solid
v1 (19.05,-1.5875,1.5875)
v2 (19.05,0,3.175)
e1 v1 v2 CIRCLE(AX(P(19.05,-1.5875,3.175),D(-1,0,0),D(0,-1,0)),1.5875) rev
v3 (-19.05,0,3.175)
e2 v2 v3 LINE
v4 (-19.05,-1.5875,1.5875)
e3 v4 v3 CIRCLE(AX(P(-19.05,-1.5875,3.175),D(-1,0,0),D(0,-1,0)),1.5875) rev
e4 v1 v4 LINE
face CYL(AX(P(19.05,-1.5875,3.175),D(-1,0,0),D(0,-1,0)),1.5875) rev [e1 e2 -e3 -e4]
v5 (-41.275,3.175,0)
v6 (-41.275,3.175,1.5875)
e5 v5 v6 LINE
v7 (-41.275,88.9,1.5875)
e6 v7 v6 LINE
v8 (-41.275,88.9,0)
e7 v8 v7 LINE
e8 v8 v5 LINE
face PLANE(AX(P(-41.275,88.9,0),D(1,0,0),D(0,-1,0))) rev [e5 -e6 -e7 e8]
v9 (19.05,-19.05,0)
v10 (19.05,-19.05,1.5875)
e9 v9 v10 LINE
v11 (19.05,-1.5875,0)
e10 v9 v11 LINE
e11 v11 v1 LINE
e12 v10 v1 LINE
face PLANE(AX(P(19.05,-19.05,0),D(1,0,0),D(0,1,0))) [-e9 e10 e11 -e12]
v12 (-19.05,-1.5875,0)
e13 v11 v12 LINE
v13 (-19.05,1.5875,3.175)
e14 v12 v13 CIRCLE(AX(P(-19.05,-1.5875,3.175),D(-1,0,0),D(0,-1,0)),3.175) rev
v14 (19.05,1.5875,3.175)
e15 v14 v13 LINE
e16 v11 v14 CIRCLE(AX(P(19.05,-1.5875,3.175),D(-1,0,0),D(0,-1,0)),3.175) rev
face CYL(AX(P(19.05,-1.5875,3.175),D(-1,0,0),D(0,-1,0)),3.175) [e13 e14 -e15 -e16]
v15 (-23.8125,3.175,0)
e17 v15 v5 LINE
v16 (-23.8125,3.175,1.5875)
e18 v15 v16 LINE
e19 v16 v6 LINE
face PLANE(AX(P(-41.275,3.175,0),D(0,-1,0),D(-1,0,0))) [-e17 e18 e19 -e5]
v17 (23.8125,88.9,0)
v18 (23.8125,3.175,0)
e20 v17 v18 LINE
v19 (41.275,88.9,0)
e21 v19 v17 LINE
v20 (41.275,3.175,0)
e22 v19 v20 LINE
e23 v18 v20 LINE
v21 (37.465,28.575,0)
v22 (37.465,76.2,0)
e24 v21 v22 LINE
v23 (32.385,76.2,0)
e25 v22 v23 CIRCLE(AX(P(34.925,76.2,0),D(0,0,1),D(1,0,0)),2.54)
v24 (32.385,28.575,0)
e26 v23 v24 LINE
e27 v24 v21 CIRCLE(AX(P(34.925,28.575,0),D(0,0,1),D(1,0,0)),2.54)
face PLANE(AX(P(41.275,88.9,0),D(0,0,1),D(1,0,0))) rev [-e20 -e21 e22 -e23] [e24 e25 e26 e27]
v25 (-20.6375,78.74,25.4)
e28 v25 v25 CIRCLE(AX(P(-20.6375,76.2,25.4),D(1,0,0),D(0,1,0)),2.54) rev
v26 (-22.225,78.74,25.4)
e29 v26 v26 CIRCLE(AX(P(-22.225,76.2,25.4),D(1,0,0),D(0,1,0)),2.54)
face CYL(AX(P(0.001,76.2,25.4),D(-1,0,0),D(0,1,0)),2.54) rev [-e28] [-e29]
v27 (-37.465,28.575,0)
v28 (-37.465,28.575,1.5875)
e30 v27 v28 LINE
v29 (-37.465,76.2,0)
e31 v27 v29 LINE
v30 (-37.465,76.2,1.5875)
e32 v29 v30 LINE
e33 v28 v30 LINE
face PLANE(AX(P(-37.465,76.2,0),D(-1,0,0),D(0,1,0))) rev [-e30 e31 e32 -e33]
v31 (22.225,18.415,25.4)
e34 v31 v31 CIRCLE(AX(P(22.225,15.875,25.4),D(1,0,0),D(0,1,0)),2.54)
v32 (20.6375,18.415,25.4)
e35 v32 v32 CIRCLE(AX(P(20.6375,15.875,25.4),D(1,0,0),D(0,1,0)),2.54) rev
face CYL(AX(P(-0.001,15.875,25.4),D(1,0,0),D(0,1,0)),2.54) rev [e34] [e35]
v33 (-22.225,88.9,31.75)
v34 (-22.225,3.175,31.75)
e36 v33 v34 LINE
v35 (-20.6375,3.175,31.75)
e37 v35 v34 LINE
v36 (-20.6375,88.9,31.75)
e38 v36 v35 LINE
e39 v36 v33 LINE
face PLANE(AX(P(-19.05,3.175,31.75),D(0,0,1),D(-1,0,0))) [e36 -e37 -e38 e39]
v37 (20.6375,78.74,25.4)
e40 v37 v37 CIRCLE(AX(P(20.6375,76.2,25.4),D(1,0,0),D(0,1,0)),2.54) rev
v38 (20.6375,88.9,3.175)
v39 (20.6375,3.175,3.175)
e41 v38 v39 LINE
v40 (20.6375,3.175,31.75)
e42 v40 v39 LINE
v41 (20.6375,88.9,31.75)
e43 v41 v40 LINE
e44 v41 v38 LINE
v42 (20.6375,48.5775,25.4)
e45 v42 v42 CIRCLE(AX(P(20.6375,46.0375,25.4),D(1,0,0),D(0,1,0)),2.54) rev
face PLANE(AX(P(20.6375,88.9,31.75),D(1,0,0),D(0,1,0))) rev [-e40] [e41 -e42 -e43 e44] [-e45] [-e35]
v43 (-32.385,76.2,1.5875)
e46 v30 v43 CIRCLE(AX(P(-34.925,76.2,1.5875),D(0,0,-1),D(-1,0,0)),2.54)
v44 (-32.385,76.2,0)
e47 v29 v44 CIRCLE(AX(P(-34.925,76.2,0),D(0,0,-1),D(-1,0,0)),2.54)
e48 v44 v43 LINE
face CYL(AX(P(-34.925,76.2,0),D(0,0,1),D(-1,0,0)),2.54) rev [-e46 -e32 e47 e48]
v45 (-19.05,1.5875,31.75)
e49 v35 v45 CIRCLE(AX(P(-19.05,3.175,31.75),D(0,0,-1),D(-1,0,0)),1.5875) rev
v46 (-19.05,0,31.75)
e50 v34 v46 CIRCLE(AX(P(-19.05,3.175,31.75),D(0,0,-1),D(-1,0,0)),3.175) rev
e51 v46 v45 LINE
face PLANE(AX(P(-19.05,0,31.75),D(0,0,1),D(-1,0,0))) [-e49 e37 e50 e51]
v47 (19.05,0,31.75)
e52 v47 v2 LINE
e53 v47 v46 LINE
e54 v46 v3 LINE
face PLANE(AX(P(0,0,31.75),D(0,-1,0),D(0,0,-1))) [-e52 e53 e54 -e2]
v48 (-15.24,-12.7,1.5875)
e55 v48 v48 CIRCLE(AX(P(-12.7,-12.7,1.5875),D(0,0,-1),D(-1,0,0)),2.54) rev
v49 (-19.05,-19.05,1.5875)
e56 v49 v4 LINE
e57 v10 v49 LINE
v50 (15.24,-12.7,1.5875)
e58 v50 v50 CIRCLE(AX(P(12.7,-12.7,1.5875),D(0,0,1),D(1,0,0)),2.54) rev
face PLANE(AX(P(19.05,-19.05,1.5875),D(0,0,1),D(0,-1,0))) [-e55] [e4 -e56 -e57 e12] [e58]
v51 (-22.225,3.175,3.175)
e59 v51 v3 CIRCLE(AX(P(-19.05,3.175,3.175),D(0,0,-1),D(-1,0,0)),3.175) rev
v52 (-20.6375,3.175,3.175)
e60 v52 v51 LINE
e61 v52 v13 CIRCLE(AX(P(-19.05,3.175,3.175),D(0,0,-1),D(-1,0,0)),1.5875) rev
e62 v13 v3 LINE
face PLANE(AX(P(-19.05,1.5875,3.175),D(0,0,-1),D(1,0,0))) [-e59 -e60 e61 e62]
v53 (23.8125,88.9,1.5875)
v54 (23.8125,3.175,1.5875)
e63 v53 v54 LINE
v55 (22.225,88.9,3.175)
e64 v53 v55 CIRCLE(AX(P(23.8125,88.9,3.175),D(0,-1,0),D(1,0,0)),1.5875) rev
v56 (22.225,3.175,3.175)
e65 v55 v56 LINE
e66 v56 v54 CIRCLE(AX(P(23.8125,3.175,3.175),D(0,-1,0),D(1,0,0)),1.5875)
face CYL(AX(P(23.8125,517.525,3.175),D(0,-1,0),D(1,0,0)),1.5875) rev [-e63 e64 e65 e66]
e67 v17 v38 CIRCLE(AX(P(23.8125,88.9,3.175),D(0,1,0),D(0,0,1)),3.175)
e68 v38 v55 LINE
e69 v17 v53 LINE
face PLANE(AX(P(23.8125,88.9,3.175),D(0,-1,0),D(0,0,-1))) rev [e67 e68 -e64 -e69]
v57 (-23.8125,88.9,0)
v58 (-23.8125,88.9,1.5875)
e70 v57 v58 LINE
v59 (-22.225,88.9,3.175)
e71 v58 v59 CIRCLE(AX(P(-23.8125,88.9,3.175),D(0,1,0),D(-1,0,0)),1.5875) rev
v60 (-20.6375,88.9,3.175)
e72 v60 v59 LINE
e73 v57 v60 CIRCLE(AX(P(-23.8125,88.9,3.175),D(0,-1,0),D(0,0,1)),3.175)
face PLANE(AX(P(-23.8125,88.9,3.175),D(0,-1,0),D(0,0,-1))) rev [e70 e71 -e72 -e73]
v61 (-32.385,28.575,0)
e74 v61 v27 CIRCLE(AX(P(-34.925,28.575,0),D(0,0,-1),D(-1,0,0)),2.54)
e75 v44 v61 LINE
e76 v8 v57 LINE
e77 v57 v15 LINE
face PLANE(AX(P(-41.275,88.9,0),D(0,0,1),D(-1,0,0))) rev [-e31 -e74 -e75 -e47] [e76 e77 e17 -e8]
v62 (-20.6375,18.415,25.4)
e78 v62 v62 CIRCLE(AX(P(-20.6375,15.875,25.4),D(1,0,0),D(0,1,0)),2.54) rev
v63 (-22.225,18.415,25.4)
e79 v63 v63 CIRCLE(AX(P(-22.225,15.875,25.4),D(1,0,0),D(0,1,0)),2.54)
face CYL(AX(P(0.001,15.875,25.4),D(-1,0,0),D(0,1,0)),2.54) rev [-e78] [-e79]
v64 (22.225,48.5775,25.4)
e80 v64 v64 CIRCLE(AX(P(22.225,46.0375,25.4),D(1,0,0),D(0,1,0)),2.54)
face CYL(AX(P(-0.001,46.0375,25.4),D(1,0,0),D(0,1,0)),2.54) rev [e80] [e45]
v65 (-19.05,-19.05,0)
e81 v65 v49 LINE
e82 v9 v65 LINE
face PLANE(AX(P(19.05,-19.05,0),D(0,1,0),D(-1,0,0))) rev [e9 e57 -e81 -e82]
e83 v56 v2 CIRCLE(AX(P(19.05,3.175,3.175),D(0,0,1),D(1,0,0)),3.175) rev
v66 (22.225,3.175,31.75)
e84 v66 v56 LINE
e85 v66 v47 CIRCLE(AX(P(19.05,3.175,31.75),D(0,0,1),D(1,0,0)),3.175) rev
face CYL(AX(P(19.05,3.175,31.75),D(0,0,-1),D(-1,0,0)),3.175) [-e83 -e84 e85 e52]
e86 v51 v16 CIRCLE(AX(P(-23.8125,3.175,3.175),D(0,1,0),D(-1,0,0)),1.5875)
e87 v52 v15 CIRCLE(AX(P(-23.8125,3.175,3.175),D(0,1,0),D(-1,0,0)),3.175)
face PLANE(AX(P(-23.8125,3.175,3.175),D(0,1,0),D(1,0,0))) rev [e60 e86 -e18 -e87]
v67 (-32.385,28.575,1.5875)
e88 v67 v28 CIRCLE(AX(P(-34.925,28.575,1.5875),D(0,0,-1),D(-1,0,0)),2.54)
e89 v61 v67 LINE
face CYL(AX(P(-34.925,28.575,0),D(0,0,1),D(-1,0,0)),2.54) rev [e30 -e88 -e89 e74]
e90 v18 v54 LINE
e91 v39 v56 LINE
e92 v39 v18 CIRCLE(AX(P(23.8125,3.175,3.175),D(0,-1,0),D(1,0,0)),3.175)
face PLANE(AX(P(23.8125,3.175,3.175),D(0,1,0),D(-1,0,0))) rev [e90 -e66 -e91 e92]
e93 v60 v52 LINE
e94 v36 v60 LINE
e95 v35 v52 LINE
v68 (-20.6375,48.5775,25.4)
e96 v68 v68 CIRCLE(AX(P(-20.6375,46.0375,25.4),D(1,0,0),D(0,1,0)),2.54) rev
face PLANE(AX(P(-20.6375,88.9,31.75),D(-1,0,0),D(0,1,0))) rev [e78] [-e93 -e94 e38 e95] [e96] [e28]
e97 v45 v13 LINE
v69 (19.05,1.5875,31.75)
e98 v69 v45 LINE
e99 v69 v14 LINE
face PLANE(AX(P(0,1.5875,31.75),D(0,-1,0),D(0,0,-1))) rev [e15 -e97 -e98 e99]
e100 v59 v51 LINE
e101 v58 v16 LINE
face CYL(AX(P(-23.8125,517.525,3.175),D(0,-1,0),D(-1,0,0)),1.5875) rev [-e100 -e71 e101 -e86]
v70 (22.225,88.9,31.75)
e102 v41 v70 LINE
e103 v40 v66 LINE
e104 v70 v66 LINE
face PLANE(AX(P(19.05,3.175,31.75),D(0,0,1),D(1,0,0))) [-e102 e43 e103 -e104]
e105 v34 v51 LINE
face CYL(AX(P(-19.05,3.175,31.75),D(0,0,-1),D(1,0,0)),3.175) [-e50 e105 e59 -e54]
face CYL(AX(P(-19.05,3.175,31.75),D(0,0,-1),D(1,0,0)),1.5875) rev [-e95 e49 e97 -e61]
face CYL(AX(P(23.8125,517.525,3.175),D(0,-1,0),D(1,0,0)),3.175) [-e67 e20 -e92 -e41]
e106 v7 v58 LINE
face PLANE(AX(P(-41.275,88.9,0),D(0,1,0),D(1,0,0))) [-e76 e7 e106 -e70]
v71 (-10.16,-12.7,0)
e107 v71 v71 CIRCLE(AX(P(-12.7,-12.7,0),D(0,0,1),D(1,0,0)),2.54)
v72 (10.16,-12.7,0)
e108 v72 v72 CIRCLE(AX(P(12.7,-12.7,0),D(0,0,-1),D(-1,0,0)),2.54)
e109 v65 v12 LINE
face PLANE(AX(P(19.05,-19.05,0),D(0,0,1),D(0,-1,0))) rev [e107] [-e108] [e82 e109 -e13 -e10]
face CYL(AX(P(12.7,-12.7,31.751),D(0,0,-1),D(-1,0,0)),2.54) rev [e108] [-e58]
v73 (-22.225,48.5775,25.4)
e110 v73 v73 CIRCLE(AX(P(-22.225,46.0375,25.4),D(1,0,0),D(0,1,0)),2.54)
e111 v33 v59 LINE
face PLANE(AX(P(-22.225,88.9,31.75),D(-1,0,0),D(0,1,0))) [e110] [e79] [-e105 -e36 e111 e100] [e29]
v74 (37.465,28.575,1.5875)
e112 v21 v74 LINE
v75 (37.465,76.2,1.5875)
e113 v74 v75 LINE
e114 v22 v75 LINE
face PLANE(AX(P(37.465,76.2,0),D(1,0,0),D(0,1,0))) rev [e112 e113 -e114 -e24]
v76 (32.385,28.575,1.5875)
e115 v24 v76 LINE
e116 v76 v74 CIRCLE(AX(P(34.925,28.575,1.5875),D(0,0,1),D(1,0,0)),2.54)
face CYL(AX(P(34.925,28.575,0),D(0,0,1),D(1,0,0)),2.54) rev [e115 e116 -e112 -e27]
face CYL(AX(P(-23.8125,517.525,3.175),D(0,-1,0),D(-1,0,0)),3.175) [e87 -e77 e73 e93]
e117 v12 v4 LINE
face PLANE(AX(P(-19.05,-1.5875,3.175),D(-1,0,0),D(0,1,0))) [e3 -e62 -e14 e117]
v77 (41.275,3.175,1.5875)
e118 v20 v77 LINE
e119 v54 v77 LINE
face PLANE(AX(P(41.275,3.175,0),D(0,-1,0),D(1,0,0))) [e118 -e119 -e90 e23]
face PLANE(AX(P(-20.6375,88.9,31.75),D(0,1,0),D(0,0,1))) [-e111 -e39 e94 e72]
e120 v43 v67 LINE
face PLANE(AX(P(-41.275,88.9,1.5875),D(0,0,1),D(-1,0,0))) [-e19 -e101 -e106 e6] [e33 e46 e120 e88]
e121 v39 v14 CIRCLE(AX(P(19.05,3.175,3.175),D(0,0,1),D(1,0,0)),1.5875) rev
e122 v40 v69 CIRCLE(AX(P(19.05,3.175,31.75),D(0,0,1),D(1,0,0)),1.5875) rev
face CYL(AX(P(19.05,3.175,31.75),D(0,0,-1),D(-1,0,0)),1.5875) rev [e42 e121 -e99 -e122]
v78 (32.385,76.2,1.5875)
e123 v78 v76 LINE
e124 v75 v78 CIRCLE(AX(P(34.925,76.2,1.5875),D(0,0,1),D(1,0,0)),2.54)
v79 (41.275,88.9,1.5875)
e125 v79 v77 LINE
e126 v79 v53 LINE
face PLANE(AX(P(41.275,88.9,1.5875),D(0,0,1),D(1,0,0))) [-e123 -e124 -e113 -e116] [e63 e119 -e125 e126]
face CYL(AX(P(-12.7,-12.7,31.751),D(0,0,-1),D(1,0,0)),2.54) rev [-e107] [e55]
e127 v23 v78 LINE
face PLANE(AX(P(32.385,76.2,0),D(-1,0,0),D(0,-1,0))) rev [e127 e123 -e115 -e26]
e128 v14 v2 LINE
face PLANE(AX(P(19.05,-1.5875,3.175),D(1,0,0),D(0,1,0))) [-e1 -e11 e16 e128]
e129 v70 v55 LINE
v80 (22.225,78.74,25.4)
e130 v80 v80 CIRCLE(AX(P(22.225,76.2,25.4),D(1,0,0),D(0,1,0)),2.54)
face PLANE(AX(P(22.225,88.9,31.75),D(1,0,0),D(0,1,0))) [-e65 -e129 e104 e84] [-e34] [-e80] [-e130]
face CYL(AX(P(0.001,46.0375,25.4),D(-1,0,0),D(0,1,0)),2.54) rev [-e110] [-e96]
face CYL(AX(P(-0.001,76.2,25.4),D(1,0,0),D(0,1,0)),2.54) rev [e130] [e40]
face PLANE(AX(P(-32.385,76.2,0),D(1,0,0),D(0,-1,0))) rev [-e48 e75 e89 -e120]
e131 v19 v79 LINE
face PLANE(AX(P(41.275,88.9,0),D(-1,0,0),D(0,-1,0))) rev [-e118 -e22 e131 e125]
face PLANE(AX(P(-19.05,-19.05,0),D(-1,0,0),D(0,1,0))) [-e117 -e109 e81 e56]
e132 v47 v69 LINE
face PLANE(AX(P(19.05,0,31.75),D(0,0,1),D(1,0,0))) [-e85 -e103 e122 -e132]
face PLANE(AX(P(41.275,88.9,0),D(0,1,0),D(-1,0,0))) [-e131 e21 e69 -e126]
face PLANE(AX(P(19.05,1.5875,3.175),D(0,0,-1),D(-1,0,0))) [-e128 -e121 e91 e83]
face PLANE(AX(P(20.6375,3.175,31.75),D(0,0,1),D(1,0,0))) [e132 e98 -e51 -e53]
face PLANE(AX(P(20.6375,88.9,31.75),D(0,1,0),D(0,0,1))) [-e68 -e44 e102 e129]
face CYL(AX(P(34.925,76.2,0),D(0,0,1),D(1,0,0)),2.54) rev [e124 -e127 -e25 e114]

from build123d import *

# Parameters (mm, degrees)
BASE_FLANGE_DEPTH         = 31.75
MITER_FLANGE2_DEPTH       = 88.9
MITER_FLANGE2_2_DEPTH     = 3.175
MITER_START               = 3.175
MITER_FLANGE2_3_DEPTH     = 85.725
MITER_START_2             = -19.05
MITER_FLANGE2_4_OUTLINE_W = 19.05
MITER_FLANGE2_4_OUTLINE_H = 1.5875
MITER_FLANGE2_4_DEPTH     = 17.4625
MITER_FLANGE2_5_DEPTH     = 19.05
MITER_FLANGE2_6_DEPTH     = 19.05
CUT_EXTRUDE5_DEPTH        = 1.5875
CUT_EXTRUDE2_REACH        = 105.029
SKETCH5_R                 = 2.54
CUT_EXTRUDE4_REACH        = 107.049
SKETCH7_R                 = 2.54


with BuildPart() as part:
    # Base-Flange: sheet metal written as solids
    # Sketch1 → Base-Flange (new body)
    with BuildSketch(Plane.XY):
        with BuildLine():
            Line((0, 0), (19.05, 0))
            ThreePointArc((19.05, 0), (21.29506403, 0.92993597), (22.225, 3.175))
            Line((22.225, 3.175), (22.225, 88.9))
            Line((22.225, 88.9), (20.6375, 88.9))
            Line((20.6375, 88.9), (20.6375, 3.175))
            ThreePointArc((20.6375, 3.175), (20.172532015, 2.052467985), (19.05, 1.5875))
            Line((19.05, 1.5875), (0, 1.5875))
            Line((0, 1.5875), (0, 0))
        make_face()
    extrude(amount=BASE_FLANGE_DEPTH)

    # Miter Flange2: read off the stored shape, not the designer's step
    # Miter Flange2 outline → Miter Flange2 (cut)
    with BuildSketch(Plane(origin=(0, 0, 0), x_dir=(1, 0, 0), z_dir=(0, 1, 0))):
        with BuildLine():
            Line((22.225, 0), (19.05, 0))
            Line((19.05, 0), (19.05, -3.175))
            Line((19.05, -3.175), (20.6375, -3.175))
            ThreePointArc((20.6375, -3.175), (21.062869343, -1.5875), (22.225, -0.425369343))
            Line((22.225, -0.425369343), (22.225, 0))
        make_face()
    extrude(amount=MITER_FLANGE2_DEPTH, mode=Mode.SUBTRACT)

    # Miter Flange2 2 outline → Miter Flange2 2 (cut)
    with BuildSketch(Plane(origin=(0, 0, 0), x_dir=(1, 0, 0), z_dir=(0, 1, 0))):
        with BuildLine():
            Line((20.6375, -3.175), (22.225, -3.175))
            Line((22.225, -3.175), (22.225, -0.425369343))
            ThreePointArc((22.225, -0.425369343), (21.062869343, -1.5875), (20.6375, -3.175))
        make_face()
    extrude(amount=MITER_FLANGE2_2_DEPTH, mode=Mode.SUBTRACT)

    # Miter Flange2 3 outline → Miter Flange2 3 (add)
    with BuildSketch(Plane(origin=(0, 0, 0), x_dir=(1, 0, 0), z_dir=(0, 1, 0)).offset(MITER_START)):
        with BuildLine():
            Line((22.225, -0.425369343), (22.225, -3.175))
            ThreePointArc((22.225, -3.175), (22.689967985, -2.052467985), (23.8125, -1.5875))
            Line((23.8125, -1.5875), (41.275, -1.5875))
            Line((41.275, -1.5875), (41.275, 0))
            Line((41.275, 0), (23.8125, 0))
            ThreePointArc((23.8125, 0), (22.990749532, -0.108185502), (22.225, -0.425369343))
        make_face()
    extrude(amount=MITER_FLANGE2_3_DEPTH)

    # Miter Flange2 5 outline → Miter Flange2 5 (cut)
    with BuildSketch(Plane.YZ):
        with BuildLine():
            ThreePointArc((1.5875, 3.175), (1.162130657, 1.5875), (0, 0.425369343))
            Line((0, 0.425369343), (0, 0))
            Line((0, 0), (1.5875, 0))
            Line((1.5875, 0), (1.5875, 3.175))
        make_face()
    extrude(amount=MITER_FLANGE2_5_DEPTH, mode=Mode.SUBTRACT)



with BuildPart() as body_2:
    # Miter Flange2 4 outline → Miter Flange2 4 (new body)
    with BuildSketch(Plane(origin=(0, 0, 0), x_dir=(1, 0, 0), z_dir=(0, 1, 0)).offset(MITER_START_2)):
        with Locations((9.525, -0.79375)):
            Rectangle(MITER_FLANGE2_4_OUTLINE_W, MITER_FLANGE2_4_OUTLINE_H)
    extrude(amount=MITER_FLANGE2_4_DEPTH)


with BuildPart() as part_1:
    add(part.part)

    add(body_2.part)  # Miter Flange2 6 merges body 2
    # Miter Flange2 6 outline → Miter Flange2 6 (add)
    with BuildSketch(Plane.YZ):
        with BuildLine():
            Line((0, 0.425369343), (0, 3.175))
            ThreePointArc((0, 3.175), (-0.464967985, 2.052467985), (-1.5875, 1.5875))
            Line((-1.5875, 1.5875), (-1.5875, 0))
            ThreePointArc((-1.5875, 0), (-0.765749532, 0.108185502), (0, 0.425369343))
        make_face()
    extrude(amount=MITER_FLANGE2_6_DEPTH)

    # Sketch8 → Cut-Extrude5 (cut)
    with BuildSketch(Plane.XY.offset(1.5875)):
        with BuildLine():
            Line((32.385, 76.2), (32.385, 28.575))
            ThreePointArc((32.385, 28.575), (34.925, 26.035), (37.465, 28.575))
            Line((37.465, 28.575), (37.465, 76.2))
            ThreePointArc((37.465, 76.2), (34.925, 78.74), (32.385, 76.2))
        make_face()
    extrude(amount=-CUT_EXTRUDE5_DEPTH, mode=Mode.SUBTRACT)

    # Sketch5 → Cut-Extrude2 (cut, up to next)
    with BuildSketch(Plane(origin=(0, 0, 0), x_dir=(-1, 0, 0), z_dir=(0, 0, -1)), mode=Mode.PRIVATE) as cut_extrude2_sk1:
        with Locations((-12.7, -12.7)):
            Circle(SKETCH5_R)
    cut_extrude2_tool1 = extrude(cut_extrude2_sk1.sketch, amount=-CUT_EXTRUDE2_REACH, mode=Mode.PRIVATE) & part_1.part
    add(cut_extrude2_tool1.solids().sort_by_distance((12.7, -12.7, 0))[0], mode=Mode.SUBTRACT)

    # Sketch7 → Cut-Extrude4 (cut, up to next)
    with BuildSketch(Plane(origin=(22.225, -0.213353633, 50.991788494), x_dir=(0, 0, -1), z_dir=(1, 0, 0)), mode=Mode.PRIVATE) as cut_extrude4_sk1:
        with Locations(Location((25.591788494, 76.413353633, 0), (0, 0, 90))):
            Circle(SKETCH7_R)
    cut_extrude4_tool1 = extrude(cut_extrude4_sk1.sketch, amount=-CUT_EXTRUDE4_REACH, mode=Mode.PRIVATE) & part_1.part
    # Sketch7 → Cut-Extrude4 (cut, up to next)
    with BuildSketch(Plane(origin=(22.225, -0.213353633, 50.991788494), x_dir=(0, 0, -1), z_dir=(1, 0, 0)), mode=Mode.PRIVATE) as cut_extrude4_sk2:
        with Locations(Location((25.591788494, 46.250853633, 0), (0, 0, 90))):
            Circle(SKETCH7_R)
    cut_extrude4_tool2 = extrude(cut_extrude4_sk2.sketch, amount=-CUT_EXTRUDE4_REACH, mode=Mode.PRIVATE) & part_1.part
    # Sketch7 → Cut-Extrude4 (cut, up to next)
    with BuildSketch(Plane(origin=(22.225, -0.213353633, 50.991788494), x_dir=(0, 0, -1), z_dir=(1, 0, 0)), mode=Mode.PRIVATE) as cut_extrude4_sk3:
        with Locations(Location((25.591788494, 16.088353633, 0), (0, 0, 90))):
            Circle(SKETCH7_R)
    cut_extrude4_tool3 = extrude(cut_extrude4_sk3.sketch, amount=-CUT_EXTRUDE4_REACH, mode=Mode.PRIVATE) & part_1.part
    add(cut_extrude4_tool1.solids().sort_by_distance((22.225, 76.2, 25.4))[0], mode=Mode.SUBTRACT)
    add(cut_extrude4_tool2.solids().sort_by_distance((22.225, 46.0375, 25.4))[0], mode=Mode.SUBTRACT)
    add(cut_extrude4_tool3.solids().sort_by_distance((22.225, 15.875, 25.4))[0], mode=Mode.SUBTRACT)

    # SHM-Mirror1: part across plane


with BuildPart() as part_2:
    add(part_1.part)
    add(part_1.part.mirror(Plane(origin=(0, 0, 31.75), x_dir=(0, 0, 1), z_dir=(-1, 0, 0))))


solid = part_2.part
